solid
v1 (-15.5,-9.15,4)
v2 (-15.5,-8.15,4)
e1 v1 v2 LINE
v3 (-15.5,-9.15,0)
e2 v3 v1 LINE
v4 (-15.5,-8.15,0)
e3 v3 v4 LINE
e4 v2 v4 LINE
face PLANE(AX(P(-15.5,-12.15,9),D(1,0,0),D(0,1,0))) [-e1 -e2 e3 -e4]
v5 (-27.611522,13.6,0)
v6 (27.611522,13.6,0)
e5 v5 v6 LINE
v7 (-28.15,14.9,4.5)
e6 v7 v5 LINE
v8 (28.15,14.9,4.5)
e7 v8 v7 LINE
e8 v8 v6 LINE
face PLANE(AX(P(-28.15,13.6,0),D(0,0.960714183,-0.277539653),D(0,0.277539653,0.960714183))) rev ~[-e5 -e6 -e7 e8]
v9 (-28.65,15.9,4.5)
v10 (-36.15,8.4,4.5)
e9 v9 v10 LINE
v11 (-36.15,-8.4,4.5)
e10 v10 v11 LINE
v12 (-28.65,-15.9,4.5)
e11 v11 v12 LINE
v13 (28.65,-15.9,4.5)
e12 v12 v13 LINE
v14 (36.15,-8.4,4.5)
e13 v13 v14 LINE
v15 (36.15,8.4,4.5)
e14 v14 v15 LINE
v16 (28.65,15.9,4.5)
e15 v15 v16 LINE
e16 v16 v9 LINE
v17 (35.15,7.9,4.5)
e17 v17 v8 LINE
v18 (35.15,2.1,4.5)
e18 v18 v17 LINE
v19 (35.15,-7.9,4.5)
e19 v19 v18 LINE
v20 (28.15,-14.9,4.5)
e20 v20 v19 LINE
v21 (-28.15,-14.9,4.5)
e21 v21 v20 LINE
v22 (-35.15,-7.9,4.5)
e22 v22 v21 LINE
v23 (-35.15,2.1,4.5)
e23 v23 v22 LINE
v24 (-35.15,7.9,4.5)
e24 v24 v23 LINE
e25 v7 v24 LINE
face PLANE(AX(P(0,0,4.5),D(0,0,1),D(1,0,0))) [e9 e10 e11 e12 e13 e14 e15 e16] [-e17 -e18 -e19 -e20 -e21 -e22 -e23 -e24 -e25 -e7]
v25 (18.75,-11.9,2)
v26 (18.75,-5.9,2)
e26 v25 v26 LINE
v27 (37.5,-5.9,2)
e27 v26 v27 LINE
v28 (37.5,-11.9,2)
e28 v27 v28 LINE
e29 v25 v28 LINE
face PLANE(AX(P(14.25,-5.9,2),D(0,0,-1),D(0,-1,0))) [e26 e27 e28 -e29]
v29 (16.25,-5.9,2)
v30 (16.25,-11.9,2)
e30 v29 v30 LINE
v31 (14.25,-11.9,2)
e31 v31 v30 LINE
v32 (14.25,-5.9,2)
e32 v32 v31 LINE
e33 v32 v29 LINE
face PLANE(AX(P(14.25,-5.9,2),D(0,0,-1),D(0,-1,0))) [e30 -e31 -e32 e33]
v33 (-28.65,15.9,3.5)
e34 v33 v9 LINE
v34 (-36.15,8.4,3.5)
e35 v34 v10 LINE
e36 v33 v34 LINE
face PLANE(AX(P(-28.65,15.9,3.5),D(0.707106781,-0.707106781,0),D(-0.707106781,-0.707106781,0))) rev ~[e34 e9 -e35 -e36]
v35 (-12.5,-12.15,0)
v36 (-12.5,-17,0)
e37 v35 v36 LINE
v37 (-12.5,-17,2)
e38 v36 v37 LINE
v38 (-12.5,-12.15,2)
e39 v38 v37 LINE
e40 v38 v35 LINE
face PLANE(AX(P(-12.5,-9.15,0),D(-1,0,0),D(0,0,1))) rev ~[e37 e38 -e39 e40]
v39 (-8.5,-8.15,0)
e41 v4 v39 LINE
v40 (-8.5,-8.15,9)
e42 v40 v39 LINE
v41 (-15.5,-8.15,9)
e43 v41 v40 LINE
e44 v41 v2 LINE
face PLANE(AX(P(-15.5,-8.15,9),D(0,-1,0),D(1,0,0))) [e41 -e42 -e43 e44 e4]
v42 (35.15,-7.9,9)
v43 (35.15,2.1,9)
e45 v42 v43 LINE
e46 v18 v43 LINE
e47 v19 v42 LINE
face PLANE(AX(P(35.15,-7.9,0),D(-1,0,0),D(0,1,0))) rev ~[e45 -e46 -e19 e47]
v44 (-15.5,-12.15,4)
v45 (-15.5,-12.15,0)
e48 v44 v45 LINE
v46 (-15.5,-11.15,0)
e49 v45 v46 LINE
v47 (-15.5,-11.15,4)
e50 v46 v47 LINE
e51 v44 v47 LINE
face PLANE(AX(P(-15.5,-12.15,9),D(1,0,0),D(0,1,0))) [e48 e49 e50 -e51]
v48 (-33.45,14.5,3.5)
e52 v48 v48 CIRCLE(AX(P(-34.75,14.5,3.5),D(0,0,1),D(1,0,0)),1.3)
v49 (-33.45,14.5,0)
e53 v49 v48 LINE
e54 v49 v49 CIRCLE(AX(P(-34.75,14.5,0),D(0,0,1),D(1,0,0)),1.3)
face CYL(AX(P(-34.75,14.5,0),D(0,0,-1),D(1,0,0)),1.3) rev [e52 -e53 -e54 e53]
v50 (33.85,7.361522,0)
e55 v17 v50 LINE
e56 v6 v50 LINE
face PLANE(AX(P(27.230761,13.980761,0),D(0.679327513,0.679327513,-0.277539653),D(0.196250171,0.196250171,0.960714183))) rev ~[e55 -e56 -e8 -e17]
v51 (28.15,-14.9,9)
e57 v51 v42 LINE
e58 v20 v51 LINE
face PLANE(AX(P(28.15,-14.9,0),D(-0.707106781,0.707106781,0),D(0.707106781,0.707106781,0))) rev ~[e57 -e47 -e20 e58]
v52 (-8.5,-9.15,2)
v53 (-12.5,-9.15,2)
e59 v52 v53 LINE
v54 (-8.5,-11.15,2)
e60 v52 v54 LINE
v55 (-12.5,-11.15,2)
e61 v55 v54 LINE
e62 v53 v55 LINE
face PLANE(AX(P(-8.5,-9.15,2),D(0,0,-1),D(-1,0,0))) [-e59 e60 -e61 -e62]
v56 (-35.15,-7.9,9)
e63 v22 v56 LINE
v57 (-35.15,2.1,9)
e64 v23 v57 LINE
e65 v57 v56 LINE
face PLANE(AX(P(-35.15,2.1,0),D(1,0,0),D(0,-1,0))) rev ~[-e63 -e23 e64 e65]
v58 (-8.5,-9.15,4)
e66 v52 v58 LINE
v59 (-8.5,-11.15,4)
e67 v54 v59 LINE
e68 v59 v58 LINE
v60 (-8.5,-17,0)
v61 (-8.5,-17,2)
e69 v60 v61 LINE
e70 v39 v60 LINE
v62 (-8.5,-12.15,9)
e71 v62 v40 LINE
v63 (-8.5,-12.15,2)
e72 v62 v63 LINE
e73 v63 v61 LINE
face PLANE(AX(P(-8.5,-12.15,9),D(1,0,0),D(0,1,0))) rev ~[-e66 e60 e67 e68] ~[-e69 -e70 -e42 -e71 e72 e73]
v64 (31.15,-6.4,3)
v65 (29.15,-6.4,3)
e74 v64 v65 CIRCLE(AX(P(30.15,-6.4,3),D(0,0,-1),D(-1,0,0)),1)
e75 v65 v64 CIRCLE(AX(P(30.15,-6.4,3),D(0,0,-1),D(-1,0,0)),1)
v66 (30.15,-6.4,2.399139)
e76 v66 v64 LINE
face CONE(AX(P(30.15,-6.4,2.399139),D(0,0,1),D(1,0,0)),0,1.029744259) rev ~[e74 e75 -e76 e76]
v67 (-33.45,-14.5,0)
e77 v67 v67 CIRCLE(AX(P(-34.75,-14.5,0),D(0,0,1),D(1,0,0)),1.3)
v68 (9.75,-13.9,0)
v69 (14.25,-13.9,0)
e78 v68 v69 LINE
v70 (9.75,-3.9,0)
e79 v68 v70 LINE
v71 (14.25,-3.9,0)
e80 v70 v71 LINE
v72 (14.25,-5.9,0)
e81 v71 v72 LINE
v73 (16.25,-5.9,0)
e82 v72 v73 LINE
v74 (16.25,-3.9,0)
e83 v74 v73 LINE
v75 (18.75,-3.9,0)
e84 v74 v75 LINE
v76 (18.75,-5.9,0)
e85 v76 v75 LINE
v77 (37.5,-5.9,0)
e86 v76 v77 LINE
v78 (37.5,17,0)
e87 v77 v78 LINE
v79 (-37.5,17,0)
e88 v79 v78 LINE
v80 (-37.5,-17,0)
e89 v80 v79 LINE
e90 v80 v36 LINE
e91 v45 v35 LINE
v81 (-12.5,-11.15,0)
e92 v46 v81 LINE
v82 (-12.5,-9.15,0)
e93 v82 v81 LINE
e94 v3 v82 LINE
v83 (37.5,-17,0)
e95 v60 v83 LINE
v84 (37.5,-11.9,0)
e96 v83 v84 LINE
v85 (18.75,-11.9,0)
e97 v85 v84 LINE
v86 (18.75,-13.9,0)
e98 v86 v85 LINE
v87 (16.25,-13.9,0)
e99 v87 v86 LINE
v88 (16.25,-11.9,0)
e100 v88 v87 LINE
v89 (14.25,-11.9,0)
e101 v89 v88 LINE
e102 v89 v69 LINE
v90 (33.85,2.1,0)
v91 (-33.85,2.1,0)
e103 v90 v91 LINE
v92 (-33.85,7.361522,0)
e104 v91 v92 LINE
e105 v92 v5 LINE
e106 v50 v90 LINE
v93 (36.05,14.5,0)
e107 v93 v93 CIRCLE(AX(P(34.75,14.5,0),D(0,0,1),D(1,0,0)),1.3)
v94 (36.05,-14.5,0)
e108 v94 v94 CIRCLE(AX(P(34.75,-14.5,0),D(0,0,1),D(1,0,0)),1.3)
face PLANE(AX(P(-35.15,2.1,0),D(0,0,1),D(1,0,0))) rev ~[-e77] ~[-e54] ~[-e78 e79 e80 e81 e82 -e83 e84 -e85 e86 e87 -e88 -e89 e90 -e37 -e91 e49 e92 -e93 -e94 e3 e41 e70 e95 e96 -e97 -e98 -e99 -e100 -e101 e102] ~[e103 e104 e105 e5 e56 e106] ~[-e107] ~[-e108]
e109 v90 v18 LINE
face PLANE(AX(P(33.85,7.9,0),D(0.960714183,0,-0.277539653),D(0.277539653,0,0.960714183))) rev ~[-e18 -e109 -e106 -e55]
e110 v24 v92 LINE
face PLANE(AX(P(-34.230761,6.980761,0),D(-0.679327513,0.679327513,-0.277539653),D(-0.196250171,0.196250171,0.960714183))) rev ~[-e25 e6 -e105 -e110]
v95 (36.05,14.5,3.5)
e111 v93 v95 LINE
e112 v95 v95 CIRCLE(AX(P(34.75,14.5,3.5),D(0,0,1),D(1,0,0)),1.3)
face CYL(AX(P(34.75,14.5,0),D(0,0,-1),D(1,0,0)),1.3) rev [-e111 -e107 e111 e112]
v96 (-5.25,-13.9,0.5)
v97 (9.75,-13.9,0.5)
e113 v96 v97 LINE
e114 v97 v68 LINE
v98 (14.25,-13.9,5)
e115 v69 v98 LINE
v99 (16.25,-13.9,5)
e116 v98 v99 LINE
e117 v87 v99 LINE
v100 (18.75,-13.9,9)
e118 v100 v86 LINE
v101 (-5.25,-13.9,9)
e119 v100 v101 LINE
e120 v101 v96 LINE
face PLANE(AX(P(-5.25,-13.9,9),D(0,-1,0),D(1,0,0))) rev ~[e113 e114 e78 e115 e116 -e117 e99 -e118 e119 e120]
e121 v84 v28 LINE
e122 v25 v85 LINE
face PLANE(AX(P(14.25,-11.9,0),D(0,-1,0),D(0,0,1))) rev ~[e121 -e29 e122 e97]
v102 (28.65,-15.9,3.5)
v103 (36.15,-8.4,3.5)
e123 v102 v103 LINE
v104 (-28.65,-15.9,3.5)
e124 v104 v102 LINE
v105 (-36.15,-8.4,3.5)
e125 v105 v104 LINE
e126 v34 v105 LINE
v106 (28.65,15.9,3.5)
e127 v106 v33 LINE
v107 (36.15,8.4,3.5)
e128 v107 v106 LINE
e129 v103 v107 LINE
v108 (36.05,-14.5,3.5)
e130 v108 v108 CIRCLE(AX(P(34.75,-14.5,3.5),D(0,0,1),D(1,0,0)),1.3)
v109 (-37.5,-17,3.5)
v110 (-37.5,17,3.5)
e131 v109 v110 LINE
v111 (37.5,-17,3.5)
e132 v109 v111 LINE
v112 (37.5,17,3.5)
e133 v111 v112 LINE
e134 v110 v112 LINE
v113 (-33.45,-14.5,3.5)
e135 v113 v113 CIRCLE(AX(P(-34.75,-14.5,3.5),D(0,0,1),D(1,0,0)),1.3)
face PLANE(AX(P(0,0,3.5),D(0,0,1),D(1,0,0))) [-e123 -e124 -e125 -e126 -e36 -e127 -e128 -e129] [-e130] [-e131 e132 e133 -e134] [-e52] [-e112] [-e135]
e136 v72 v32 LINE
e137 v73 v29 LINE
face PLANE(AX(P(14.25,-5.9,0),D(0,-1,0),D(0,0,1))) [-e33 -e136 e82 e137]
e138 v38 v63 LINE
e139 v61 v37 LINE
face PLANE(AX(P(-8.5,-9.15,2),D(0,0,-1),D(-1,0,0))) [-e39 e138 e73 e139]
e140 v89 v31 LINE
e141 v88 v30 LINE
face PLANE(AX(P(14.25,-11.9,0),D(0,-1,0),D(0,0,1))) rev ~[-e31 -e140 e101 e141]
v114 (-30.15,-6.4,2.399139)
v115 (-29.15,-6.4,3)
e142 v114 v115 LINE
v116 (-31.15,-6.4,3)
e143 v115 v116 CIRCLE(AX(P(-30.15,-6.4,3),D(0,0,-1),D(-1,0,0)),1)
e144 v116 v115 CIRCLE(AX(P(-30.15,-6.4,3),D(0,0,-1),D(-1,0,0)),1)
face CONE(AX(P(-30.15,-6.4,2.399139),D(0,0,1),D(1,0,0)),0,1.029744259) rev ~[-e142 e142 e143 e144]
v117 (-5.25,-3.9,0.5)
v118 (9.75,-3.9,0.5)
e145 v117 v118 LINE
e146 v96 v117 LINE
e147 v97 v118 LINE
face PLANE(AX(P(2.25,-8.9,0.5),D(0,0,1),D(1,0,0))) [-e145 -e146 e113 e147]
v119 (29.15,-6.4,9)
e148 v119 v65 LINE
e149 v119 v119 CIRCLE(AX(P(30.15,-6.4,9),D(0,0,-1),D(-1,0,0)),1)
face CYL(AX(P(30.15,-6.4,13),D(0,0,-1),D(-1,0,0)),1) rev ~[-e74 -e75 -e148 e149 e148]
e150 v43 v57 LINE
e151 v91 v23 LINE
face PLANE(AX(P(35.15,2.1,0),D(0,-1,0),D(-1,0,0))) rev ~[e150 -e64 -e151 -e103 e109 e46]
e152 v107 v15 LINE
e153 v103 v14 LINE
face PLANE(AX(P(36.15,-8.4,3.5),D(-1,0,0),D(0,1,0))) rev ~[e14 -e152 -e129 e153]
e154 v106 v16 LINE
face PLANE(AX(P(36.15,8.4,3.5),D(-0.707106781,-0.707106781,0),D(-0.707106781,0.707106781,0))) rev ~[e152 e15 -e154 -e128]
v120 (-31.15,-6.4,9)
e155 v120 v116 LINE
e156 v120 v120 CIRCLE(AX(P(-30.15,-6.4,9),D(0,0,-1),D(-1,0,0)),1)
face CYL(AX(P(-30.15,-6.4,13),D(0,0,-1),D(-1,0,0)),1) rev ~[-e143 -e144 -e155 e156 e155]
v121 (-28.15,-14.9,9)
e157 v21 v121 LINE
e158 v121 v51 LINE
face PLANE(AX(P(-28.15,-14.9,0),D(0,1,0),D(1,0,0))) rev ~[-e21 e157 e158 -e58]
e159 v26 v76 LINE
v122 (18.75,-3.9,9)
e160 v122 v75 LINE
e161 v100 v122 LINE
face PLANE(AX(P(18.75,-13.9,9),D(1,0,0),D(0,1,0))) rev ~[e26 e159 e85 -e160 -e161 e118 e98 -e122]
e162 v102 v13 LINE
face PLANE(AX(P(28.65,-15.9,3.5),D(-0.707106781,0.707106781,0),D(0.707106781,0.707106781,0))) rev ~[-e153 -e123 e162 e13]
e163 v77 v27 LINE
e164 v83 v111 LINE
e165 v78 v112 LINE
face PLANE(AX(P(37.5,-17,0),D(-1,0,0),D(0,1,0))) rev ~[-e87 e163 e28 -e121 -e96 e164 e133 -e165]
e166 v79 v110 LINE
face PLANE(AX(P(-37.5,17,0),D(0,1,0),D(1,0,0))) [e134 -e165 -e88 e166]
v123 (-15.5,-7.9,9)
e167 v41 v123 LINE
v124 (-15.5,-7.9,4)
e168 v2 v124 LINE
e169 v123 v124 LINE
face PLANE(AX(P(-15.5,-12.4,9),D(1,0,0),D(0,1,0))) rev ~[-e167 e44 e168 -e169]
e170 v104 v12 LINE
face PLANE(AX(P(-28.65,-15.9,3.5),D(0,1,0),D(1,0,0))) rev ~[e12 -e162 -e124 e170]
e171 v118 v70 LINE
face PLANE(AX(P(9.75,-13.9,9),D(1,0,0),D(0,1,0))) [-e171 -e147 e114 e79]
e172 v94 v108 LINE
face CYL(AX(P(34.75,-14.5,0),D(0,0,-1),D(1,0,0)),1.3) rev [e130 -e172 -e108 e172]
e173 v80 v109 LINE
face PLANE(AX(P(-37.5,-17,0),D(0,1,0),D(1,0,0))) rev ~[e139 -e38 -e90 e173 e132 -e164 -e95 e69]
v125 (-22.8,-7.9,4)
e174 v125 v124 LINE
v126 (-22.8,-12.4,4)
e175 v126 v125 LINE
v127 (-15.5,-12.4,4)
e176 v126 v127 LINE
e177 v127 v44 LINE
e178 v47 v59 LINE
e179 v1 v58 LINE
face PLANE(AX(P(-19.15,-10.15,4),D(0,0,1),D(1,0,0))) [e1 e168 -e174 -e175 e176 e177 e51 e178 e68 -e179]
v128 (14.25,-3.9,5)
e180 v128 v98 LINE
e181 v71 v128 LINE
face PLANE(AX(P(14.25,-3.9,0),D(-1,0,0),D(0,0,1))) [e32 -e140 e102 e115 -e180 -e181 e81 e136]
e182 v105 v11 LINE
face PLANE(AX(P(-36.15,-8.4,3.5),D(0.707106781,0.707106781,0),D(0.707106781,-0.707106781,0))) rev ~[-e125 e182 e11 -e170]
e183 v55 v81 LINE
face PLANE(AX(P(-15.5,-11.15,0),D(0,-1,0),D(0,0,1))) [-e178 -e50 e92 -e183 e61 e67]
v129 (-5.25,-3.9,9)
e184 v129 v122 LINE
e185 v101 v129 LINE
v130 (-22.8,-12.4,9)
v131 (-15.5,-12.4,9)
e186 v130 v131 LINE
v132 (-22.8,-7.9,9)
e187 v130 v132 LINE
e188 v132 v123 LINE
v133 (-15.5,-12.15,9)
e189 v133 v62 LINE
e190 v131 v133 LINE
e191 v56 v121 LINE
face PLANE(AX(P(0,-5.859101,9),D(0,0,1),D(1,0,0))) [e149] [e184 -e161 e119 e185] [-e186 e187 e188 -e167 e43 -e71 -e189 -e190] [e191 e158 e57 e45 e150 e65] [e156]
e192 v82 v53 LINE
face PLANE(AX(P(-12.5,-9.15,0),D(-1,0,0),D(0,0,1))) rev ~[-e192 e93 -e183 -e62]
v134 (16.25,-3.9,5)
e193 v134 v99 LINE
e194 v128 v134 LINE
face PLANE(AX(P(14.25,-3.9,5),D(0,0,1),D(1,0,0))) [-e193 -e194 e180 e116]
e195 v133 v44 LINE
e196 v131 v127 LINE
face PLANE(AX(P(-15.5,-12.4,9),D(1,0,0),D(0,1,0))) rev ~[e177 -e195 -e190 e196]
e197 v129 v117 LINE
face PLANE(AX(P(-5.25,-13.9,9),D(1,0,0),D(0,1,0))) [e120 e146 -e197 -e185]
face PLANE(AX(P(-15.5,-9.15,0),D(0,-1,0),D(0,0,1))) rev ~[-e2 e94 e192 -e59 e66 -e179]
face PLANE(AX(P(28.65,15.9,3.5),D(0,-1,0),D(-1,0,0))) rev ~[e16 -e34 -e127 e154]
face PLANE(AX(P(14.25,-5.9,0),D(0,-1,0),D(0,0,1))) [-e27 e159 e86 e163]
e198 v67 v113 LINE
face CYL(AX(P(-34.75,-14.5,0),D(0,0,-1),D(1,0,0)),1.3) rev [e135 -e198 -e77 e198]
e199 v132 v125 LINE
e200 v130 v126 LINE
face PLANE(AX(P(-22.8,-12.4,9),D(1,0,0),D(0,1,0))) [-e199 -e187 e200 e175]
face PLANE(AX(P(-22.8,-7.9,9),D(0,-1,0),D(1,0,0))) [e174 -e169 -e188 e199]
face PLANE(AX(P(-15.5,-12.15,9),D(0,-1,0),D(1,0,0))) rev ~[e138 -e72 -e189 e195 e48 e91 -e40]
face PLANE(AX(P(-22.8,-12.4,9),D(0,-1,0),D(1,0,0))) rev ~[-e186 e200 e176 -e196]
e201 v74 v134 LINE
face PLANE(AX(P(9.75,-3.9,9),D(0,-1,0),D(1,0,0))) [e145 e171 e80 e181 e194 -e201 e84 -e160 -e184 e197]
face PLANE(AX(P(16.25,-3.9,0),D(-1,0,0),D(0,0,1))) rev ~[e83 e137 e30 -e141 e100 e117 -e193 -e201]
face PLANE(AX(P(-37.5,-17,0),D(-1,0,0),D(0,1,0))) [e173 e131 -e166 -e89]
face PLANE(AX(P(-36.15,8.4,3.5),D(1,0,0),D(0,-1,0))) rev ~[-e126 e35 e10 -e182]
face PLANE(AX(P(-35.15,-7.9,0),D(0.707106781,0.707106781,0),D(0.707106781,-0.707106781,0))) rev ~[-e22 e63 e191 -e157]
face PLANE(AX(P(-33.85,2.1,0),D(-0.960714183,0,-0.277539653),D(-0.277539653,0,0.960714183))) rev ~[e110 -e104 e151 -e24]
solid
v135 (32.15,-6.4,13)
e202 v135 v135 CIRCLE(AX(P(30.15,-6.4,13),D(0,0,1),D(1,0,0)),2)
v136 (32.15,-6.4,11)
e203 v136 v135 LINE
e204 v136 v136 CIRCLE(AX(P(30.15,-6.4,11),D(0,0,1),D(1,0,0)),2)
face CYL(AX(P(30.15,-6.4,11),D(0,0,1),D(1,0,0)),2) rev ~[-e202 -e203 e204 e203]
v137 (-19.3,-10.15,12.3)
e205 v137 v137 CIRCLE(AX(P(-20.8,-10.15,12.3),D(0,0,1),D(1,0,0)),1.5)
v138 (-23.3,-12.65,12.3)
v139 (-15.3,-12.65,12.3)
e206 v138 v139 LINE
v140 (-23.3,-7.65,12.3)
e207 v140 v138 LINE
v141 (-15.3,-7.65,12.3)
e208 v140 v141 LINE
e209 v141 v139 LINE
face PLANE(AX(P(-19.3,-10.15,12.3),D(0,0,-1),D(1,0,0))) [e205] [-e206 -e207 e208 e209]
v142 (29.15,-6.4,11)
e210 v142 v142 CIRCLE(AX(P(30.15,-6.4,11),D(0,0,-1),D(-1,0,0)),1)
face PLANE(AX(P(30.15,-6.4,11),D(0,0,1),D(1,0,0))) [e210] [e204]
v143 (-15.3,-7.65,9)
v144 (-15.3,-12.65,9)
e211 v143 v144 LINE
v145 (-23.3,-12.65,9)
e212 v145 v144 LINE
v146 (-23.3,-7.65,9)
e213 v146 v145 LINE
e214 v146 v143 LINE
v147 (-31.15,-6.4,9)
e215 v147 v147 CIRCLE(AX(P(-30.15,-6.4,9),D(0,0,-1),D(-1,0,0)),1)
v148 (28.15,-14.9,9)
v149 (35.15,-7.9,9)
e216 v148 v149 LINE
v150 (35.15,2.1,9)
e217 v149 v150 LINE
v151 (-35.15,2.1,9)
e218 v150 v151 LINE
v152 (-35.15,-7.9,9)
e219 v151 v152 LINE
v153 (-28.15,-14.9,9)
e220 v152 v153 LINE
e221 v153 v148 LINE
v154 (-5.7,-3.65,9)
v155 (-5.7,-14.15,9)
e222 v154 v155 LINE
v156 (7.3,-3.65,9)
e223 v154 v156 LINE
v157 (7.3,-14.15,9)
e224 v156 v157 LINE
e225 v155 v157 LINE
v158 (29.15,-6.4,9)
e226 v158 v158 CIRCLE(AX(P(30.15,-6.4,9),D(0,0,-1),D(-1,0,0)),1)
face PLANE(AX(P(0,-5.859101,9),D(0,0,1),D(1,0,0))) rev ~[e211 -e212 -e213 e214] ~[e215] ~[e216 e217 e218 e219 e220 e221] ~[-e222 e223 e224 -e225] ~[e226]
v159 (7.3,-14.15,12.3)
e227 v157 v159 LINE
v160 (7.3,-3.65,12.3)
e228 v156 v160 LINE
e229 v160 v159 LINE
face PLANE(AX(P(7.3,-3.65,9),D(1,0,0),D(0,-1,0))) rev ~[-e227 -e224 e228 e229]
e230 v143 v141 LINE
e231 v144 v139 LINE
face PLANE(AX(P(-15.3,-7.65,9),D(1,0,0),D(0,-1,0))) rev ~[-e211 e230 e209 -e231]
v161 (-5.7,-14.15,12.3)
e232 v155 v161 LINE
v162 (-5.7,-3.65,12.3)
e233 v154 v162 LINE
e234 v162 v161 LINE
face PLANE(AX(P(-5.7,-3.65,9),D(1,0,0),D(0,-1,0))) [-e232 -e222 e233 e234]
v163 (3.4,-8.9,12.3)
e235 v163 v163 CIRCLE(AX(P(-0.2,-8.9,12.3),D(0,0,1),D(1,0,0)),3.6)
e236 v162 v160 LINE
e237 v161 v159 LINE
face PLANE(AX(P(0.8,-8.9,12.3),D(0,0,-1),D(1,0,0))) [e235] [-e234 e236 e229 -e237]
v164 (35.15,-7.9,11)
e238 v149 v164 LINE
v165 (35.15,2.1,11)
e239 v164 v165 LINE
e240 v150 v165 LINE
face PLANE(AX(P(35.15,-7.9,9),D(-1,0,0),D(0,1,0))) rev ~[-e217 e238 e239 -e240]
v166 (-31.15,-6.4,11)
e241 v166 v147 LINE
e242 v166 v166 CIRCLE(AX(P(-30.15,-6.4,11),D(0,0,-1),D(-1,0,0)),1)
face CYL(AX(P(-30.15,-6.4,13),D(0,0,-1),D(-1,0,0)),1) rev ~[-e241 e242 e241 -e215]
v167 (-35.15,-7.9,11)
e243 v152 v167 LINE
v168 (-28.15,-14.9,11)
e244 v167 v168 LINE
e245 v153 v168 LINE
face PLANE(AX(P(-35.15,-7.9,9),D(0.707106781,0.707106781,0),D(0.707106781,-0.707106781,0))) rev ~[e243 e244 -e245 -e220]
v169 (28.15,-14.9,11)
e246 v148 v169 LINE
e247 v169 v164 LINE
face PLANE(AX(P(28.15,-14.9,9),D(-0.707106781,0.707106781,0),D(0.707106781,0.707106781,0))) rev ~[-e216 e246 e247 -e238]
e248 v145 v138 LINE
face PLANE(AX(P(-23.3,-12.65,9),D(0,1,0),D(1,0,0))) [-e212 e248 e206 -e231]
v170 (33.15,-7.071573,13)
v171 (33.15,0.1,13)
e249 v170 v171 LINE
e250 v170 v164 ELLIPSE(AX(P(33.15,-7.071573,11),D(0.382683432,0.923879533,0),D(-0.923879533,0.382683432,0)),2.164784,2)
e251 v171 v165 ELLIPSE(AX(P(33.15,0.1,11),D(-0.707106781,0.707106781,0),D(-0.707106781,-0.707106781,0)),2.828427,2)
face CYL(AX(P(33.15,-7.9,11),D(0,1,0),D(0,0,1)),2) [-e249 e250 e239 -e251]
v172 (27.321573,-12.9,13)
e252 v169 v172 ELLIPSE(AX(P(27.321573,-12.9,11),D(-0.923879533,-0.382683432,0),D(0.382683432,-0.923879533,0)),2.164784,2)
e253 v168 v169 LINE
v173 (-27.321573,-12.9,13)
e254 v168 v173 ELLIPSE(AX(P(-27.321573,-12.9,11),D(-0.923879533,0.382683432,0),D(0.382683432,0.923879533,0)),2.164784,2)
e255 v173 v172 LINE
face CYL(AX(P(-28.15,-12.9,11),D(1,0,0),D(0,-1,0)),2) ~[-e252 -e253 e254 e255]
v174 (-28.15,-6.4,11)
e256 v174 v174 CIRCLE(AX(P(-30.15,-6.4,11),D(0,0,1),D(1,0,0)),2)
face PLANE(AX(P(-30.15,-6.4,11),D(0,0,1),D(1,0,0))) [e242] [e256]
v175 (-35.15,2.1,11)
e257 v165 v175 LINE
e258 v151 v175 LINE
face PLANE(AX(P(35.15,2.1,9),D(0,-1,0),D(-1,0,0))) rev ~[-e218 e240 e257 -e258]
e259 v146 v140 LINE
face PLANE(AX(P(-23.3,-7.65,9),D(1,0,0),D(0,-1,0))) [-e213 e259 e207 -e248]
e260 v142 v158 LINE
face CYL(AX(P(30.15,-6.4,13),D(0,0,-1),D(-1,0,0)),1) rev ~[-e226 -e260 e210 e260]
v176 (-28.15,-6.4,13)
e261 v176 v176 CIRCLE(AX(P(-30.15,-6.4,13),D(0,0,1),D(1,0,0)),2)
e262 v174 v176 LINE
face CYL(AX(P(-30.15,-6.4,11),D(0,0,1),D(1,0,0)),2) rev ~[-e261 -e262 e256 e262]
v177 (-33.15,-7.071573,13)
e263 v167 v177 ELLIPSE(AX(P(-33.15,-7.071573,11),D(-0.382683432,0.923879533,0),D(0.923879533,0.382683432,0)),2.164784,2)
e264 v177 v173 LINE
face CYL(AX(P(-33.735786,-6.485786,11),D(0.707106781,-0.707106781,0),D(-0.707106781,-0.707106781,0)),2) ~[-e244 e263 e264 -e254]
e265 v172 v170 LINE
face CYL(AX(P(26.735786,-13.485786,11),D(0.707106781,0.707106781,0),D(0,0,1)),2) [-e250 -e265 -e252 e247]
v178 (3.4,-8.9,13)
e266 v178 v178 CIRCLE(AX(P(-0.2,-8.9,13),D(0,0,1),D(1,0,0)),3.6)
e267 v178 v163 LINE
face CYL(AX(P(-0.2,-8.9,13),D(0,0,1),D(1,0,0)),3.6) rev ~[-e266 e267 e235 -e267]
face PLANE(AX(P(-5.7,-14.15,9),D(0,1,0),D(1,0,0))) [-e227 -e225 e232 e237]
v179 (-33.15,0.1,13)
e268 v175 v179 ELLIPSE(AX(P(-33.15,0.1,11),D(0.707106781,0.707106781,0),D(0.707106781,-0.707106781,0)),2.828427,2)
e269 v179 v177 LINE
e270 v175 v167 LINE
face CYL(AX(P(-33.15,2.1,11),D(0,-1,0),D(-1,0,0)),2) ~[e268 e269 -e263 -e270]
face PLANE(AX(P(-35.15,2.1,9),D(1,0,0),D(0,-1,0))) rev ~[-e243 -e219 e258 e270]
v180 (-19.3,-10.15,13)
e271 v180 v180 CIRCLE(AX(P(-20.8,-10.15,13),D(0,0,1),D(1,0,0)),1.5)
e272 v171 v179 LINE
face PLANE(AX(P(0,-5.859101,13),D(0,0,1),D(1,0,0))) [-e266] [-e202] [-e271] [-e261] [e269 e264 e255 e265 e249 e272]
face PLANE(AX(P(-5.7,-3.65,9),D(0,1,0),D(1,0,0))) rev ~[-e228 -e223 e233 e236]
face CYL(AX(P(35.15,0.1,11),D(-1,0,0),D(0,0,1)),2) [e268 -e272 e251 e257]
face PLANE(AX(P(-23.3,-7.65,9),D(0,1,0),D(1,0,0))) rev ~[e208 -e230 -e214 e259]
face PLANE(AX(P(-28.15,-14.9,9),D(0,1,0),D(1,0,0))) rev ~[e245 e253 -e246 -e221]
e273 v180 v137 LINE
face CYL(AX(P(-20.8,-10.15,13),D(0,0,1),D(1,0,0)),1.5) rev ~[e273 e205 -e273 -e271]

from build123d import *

# Parameters (mm, degrees)
F0_W              = 75
F0_H              = 34
F0_R              = 1.3
F1_DEPTH          = 3.5
F3_DEPTH          = 1
F5_DEPTH          = 5
F11_DEPTH         = 9
F12_W             = 15
F12_H             = 10
F13_DEPTH         = 8.5
F14_W             = 7.3
F14_H             = 4.5
F15_DEPTH         = 5
F16_W             = 9
F16_H             = 10
F16_W_2           = 7
F16_H_2           = 4
F17_DEPTH         = 25
F18_W             = 2
F18_H             = 5
F19_DEPTH         = 10
F20_W             = 6
F20_H             = 2
F21_DEPTH         = 25
F22_R             = 0.8
F23_DEPTH         = 5
F26_DEPTH         = 4
F27_R             = 3.6
F27_R_2           = 1.5
F28_DEPTH         = 25
F29_W             = 13
F29_H             = 10.5
F29_W_2           = 8
F29_H_2           = 5
F30_DEPTH         = 3.3
F31_W             = 2
F31_H             = 4
F32_DEPTH         = 7
F33_W             = 4
F33_H             = 2
F34_DEPTH         = 25
F36_D             = 2
F36_DEPTH         = 10
F36_CBORE_D       = 4
F36_CBORE_DEPTH   = 2
F36_TIP           = 0.600860619
F36_2_D           = 2
F36_2_DEPTH       = 10
F36_2_CBORE_D     = 4
F36_2_CBORE_DEPTH = 2
F36_2_TIP         = 0.600860619
F37_R             = 2


with BuildPart() as f1:
    # F0 (on Top) → F1 (new body)
    with BuildSketch(Plane.XY):
        Rectangle(F0_W, F0_H)
        with Locations((-34.75, -14.5)):
            Circle(F0_R, mode=Mode.SUBTRACT)
        with Locations((34.75, -14.5)):
            Circle(F0_R, mode=Mode.SUBTRACT)
        with Locations((-34.75, 14.5)):
            Circle(F0_R, mode=Mode.SUBTRACT)
        with Locations((34.75, 14.5)):
            Circle(F0_R, mode=Mode.SUBTRACT)
    extrude(amount=F1_DEPTH)

    # F2 (on face) → F3 (join)
    with BuildSketch(Plane.XY.offset(3.5)):
        Polygon((28.65, 15.9), (-28.65, 15.9), (-36.15, 8.4), (-36.15, -8.4), (-28.65, -15.9), (28.65, -15.9), (36.15, -8.4), (36.15, 8.4), align=None)
    extrude(amount=F3_DEPTH)

    # F4 (on face) → F5 (cut)
    with BuildSketch(Plane.XY.offset(4.5)):
        Polygon((28.15, 14.9), (-28.15, 14.9), (-35.15, 7.9), (-35.15, -7.9), (-28.15, -14.9), (28.15, -14.9), (35.15, -7.9), (35.15, 7.9), align=None)
    extrude(amount=-F5_DEPTH, mode=Mode.SUBTRACT)

    # F9: sweep along a path in F8
    with BuildLine(Plane.XY.offset(4.5)) as f9_path:
        Line((-35.15, 2.1), (-35.15, 7.9))
        Line((-35.15, 7.9), (-28.15, 14.9))
        Line((-28.15, 14.9), (28.15, 14.9))
        Line((28.15, 14.9), (35.15, 7.9))
        Line((35.15, 7.9), (35.15, 2.1))
    # F7 (on offset) → F9 (sweep)
    with BuildSketch(Plane.XZ.offset(-2.1)):
        Polygon((-33.85, 0), (-35.15, 4.5), (-35.15, 0), align=None)
    sweep(path=f9_path.line, transition=Transition.RIGHT)

    # F10 (on Top) → F11 (join)
    with BuildSketch(Plane.XY):
        Polygon((-35.15, -7.9), (-28.15, -14.9), (28.15, -14.9), (35.15, -7.9), (35.15, 2.1), (-35.15, 2.1), align=None)
    extrude(amount=F11_DEPTH)

    # F12 (on face) → F13 (cut)
    with BuildSketch(Plane.XY.offset(9)):
        with Locations((2.25, -8.9)):
            Rectangle(F12_W, F12_H)
    extrude(amount=-F13_DEPTH, mode=Mode.SUBTRACT)

    # F14 (on face) → F15 (cut)
    with BuildSketch(Plane.XY.offset(9)):
        with Locations((-19.15, -10.15)):
            Rectangle(F14_W, F14_H)
    extrude(amount=-F15_DEPTH, mode=Mode.SUBTRACT)

    # F16 (on face) → F17 (cut)
    with BuildSketch(Plane.XY.offset(9)):
        with Locations((14.25, -8.9)):
            Rectangle(F16_W, F16_H)
        with Locations((-12, -10.15)):
            Rectangle(F16_W_2, F16_H_2)
    extrude(amount=-F17_DEPTH, mode=Mode.SUBTRACT)

    # F18 (on face) → F19 (join)
    with BuildSketch(Plane.XZ.offset(3.9)):
        with Locations((15.25, 2.5)):
            Rectangle(F18_W, F18_H)
    extrude(amount=F19_DEPTH)

    # F20 (on face) → F21 (cut)
    with BuildSketch(Plane(origin=(14.25, 0, 0), x_dir=(0, -1, 0), z_dir=(-1, 0, 0))):
        with Locations((8.9, 1)):
            Rectangle(F20_W, F20_H)
    extrude(amount=-F21_DEPTH, mode=Mode.SUBTRACT)

    # F22 (on face) → F23 (cut)
    with BuildSketch(Plane.XY.offset(9)):
        with Locations((-30.15, -6.4)):
            Circle(F22_R)
        with Locations((30.15, -6.4)):
            Circle(F22_R)
    extrude(amount=-F23_DEPTH, mode=Mode.SUBTRACT)

    # F31 (on face) → F32 (join)
    with BuildSketch(Plane.YZ.offset(-15.5)):
        with Locations((-10.15, 2)):
            Rectangle(F31_W, F31_H)
    extrude(amount=F32_DEPTH)

    # F33 (on face) → F34 (cut)
    with BuildSketch(Plane(origin=(0, -9.15, 0), x_dir=(-1, 0, 0), z_dir=(0, 1, 0))):
        with Locations((10.5, 1)):
            Rectangle(F33_W, F33_H)
    extrude(amount=-F34_DEPTH, mode=Mode.SUBTRACT)

    # F36
    with Locations(Plane.XY.offset(13)):
        with Locations((-30.15, -6.4), (30.15, -6.4)):
            CounterBoreHole(F36_D / 2, F36_CBORE_D / 2, F36_CBORE_DEPTH, depth=F36_DEPTH)
            with Locations((0, 0, -(F36_DEPTH + F36_TIP / 2))):  # 118° drill point
                Cone(0, F36_D / 2, F36_TIP, mode=Mode.SUBTRACT)


with BuildPart() as f26:
    # F25 (on offset) → F26 (new body)
    with BuildSketch(Plane.XY.offset(9)):
        Polygon((-35.15, -7.9), (-28.15, -14.9), (28.15, -14.9), (35.15, -7.9), (35.15, 2.1), (-35.15, 2.1), align=None)
    extrude(amount=F26_DEPTH)

    # F27 (on face) → F28 (cut)
    with BuildSketch(Plane.XY.offset(13)):
        with Locations((-0.2, -8.9)):
            Circle(F27_R)
        with Locations((-20.8, -10.15)):
            Circle(F27_R_2)
    extrude(amount=-F28_DEPTH, mode=Mode.SUBTRACT)

    # F29 (on face) → F30 (cut)
    with BuildSketch(Plane(origin=(0, 0, 9), x_dir=(1, 0, 0), z_dir=(0, 0, -1))):
        with Locations((0.8, 8.9)):
            Rectangle(F29_W, F29_H)
        with Locations((-19.3, 10.15)):
            Rectangle(F29_W_2, F29_H_2)
    extrude(amount=-F30_DEPTH, mode=Mode.SUBTRACT)

    # F36#2
    with Locations(Plane.XY.offset(13)):
        with Locations((-30.15, -6.4), (30.15, -6.4)):
            CounterBoreHole(F36_2_D / 2, F36_2_CBORE_D / 2, F36_2_CBORE_DEPTH, depth=F36_2_DEPTH)
            with Locations((0, 0, -(F36_2_DEPTH + F36_2_TIP / 2))):  # 118° drill point
                Cone(0, F36_2_D / 2, F36_2_TIP, mode=Mode.SUBTRACT)

    # F37
    f37_edges = [f26.edges().sort_by_distance(p)[0] for p in [
        (0, -14.9, 13),
        (-31.65, -11.4, 13),
        (-35.15, -2.9, 13),
        (0, 2.1, 13),
        (35.15, -2.9, 13),
        (31.65, -11.4, 13),
    ]]
    fillet(f37_edges, radius=F37_R)


solid = Compound([f1.part, f26.part])
